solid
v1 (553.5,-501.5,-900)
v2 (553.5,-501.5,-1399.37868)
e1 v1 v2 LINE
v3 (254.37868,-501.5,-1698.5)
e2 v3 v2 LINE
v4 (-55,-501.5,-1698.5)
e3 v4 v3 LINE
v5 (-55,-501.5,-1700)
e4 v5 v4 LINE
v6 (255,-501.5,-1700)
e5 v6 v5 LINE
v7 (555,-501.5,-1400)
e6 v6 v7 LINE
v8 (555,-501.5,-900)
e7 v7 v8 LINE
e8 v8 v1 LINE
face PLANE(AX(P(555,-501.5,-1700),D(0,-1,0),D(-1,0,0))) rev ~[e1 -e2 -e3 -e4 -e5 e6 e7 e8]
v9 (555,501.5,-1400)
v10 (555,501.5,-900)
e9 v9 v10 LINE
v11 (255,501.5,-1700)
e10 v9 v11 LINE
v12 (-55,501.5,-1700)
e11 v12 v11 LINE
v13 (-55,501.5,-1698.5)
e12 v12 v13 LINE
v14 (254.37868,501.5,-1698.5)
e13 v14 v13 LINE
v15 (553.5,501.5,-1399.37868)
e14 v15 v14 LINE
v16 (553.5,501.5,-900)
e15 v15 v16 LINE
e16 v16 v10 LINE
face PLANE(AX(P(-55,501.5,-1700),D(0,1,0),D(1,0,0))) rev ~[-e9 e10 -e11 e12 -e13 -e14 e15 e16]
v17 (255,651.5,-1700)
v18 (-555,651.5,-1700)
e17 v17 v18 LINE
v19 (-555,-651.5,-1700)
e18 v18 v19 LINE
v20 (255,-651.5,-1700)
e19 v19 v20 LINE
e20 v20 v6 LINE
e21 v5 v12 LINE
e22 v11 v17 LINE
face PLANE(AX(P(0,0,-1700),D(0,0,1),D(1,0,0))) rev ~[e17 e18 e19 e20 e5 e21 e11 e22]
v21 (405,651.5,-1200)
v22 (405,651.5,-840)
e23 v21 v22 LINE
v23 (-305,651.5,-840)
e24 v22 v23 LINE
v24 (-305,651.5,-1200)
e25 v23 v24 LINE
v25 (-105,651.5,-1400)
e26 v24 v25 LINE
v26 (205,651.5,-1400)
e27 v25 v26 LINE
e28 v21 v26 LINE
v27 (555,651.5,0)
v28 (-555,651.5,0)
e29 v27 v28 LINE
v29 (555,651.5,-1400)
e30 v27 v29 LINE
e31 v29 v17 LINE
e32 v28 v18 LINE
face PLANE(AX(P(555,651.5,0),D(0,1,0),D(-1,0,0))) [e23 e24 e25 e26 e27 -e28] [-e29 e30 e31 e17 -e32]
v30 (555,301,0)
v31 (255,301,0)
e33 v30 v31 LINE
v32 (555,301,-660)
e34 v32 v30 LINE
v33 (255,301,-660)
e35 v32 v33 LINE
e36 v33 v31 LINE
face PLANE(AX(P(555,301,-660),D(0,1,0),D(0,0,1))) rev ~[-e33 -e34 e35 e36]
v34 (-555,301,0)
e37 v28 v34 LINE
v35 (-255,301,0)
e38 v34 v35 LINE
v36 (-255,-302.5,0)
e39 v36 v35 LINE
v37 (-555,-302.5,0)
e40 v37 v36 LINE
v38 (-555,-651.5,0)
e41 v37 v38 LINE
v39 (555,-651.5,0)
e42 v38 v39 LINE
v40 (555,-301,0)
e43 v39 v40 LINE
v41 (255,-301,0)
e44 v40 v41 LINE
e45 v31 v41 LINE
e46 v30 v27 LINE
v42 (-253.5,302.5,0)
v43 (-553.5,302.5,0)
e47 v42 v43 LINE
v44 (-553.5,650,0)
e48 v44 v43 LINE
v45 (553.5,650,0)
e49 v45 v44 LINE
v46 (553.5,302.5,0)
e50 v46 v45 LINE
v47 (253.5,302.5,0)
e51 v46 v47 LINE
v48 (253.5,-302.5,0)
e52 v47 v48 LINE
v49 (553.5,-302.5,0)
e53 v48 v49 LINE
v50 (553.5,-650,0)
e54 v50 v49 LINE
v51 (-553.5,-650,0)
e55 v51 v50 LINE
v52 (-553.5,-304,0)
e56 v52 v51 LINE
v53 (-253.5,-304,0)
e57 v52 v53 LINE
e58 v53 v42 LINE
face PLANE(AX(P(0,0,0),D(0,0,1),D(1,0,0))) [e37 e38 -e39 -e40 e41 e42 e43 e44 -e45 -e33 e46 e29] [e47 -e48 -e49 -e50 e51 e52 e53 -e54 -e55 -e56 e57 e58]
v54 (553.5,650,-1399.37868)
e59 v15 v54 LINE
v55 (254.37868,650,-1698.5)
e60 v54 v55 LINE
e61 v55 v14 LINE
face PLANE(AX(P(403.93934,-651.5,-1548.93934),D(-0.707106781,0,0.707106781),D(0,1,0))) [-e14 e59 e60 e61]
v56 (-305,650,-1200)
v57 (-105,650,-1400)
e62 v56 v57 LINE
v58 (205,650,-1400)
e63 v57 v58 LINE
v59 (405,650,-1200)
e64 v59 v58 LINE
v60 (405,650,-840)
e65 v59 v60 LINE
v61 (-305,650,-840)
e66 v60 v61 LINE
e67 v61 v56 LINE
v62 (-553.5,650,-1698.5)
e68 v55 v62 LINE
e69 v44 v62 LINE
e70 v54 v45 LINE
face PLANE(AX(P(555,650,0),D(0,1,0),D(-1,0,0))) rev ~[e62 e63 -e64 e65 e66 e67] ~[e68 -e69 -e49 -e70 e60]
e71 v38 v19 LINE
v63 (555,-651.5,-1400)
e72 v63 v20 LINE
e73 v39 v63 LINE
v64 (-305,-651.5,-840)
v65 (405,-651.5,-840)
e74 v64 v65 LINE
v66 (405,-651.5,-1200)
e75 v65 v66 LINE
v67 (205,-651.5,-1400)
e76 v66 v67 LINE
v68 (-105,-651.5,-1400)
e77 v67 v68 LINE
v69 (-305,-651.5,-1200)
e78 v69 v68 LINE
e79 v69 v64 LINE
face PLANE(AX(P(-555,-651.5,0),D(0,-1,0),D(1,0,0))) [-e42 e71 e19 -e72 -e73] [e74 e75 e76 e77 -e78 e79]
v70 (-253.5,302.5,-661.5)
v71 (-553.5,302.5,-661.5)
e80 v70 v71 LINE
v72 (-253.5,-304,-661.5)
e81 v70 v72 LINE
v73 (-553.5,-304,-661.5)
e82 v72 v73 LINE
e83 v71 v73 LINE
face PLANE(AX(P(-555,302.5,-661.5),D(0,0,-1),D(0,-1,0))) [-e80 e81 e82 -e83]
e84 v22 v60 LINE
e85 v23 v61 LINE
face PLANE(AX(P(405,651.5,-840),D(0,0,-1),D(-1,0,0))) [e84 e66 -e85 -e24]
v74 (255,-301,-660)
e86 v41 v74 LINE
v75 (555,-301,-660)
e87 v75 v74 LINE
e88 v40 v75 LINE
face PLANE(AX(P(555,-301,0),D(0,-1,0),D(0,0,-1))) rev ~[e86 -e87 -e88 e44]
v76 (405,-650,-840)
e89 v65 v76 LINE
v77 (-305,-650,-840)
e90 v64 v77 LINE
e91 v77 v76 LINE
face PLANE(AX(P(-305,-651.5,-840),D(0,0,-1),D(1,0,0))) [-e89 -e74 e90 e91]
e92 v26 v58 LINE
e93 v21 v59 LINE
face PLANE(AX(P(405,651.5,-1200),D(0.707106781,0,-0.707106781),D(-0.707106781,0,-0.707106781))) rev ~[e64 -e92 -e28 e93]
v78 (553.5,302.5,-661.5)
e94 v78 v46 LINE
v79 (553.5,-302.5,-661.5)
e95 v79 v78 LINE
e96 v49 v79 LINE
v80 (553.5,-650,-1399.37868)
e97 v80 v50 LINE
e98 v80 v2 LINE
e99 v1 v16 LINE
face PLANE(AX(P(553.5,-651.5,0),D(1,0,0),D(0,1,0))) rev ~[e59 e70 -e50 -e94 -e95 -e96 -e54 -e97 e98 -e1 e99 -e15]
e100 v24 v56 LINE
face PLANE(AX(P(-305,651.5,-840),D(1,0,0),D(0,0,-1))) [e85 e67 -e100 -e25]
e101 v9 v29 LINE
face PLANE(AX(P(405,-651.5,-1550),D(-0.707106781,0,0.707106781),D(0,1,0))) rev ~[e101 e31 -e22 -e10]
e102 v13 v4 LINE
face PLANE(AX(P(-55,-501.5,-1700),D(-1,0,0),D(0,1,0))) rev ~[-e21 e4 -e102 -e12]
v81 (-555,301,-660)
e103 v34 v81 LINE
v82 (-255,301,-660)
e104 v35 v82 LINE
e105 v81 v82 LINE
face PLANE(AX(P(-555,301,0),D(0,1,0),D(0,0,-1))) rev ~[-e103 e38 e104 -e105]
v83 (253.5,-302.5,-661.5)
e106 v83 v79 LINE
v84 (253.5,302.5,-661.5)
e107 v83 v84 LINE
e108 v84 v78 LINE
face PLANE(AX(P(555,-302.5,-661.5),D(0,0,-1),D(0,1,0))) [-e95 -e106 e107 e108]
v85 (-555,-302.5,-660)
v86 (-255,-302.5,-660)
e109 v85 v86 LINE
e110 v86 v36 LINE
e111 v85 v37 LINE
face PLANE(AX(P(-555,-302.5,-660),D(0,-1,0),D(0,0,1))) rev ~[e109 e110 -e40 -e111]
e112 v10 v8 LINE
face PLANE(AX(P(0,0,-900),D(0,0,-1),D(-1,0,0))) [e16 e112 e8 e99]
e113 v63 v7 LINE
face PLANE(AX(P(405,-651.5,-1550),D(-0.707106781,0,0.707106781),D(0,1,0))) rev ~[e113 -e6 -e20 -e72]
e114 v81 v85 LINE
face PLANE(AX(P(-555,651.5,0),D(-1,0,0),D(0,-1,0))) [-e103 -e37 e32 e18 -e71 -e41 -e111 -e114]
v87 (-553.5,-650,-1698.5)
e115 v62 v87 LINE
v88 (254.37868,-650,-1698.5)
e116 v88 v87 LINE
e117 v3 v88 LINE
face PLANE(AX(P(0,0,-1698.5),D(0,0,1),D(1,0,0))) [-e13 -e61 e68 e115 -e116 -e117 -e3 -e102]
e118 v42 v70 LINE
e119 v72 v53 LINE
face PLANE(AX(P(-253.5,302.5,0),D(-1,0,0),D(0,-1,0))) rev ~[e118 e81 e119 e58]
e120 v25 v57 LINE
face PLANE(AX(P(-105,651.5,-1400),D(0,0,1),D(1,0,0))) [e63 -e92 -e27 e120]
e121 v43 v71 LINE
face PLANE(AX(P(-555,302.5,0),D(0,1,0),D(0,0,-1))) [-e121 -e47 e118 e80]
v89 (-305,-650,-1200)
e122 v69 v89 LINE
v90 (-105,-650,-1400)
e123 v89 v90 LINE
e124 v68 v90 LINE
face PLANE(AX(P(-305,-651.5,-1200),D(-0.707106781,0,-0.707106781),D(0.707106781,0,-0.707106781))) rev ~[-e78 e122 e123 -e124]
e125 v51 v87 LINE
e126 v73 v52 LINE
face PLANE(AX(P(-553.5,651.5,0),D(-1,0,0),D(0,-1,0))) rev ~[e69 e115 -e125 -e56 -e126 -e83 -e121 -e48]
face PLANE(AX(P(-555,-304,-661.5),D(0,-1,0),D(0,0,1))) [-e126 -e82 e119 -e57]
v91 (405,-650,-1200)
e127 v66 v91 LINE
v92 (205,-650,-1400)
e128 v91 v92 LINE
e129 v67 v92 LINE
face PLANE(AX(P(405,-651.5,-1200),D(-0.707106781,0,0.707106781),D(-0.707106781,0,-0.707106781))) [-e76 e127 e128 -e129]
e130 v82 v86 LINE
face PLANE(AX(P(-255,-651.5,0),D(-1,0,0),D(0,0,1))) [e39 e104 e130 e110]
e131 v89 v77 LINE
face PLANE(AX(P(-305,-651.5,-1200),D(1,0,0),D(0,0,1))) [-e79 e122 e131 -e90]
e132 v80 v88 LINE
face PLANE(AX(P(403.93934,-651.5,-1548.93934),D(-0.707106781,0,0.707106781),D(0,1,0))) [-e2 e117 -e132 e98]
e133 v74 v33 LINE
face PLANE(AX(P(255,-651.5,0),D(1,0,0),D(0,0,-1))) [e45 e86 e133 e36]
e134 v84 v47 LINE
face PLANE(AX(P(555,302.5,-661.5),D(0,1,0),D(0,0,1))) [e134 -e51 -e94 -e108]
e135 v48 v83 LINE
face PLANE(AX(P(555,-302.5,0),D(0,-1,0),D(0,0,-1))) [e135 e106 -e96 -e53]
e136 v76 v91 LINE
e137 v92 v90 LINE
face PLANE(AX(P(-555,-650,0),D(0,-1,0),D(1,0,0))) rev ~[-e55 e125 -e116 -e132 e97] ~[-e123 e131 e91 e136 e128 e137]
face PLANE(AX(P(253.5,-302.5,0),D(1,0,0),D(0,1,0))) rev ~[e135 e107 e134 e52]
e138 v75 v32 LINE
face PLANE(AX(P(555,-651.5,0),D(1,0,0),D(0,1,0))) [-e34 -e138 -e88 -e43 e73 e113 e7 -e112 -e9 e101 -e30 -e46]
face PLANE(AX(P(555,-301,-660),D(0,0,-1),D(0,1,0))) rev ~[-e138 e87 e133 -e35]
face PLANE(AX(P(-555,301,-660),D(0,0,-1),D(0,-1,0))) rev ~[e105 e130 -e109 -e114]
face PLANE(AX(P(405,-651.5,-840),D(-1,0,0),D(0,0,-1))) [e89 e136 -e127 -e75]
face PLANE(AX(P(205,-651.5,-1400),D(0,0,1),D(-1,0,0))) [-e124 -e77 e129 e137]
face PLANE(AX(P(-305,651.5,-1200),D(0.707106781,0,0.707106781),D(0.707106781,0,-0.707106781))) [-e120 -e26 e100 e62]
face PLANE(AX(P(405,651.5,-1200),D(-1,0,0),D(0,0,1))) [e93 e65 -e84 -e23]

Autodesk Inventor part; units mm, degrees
ref_plane "YZ Plane" through (0, 0, 0) normal (1, 0, 0) x (0, 1, 0)
ref_plane "XZ Plane" through (0, 0, 0) normal (0, 1, 0) x (-1, 0, 0)
ref_plane "XY Plane" through (0, 0, 0) normal (0, 0, 1) x (1, 0, 0)
sketch "Esboço1" plane through (0, 0, 0) normal (0, 0, 1) x (1, 0, 0)
  line L0 (555, 651.5) -> (-555, 651.5)
  line L1 (-555, 651.5) -> (-555, -651.5)
  line L2 (-555, -651.5) -> (555, -651.5)
  line L3 (555, -651.5) -> (555, 651.5)
  point P0 (0, 0)
  point P1 (555, 0)
  point P2 (0, 651.5)
  dimension "d11" = 1110
  dimension "d12" = 1303
extrude "Extrusão1" add sketch "Esboço1" against normal blind 1700
sketch "Esboço3" plane through (-555, -651.5, 0) normal (0, -1, 0) x (1, 0, 0)
  line L0 (960, -1400) -> (250, -1400)
  line L1 (250, -1400) -> (250, -840)
  line L2 (250, -840) -> (960, -840)
  line L3 (960, -840) -> (960, -1400)
  line L4 (1110, 0) -> (1110, -1700) construction
  line L5 (0, 0) -> (0, -1700) construction
  line L6 (1110, -1700) -> (0, -1700) projected
  line L7 (1110, 0) -> (0, 0) construction
  point P0 (555, 0)
  dimension "d2" = 150
  dimension "d3" = 250
  dimension "d4" = 300
  dimension "d10" = 560
  dimension "d17" = 840
extrude "Extrusão2" cut sketch "Esboço3" against normal through all
chamfer "Chanfro2" distance 300 angle 45 1 edges at (555, 0, -1700)
chamfer "Chanfro1" distance 200 angle 45 2 edges at (-305, 0, -1400) (405, 0, -1400)
sketch "Esboço4" plane through (555, -651.5, 0) normal (1, 0, 0) x (0, 0, -1)
  line L0 (0, 1303) -> (0, 0) projected
  line L1 (660, 952.5) -> (0, 952.5)
  line L2 (0, 952.5) -> (0, 350.5)
  line L3 (0, 350.5) -> (660, 350.5)
  line L4 (660, 350.5) -> (660, 952.5)
  line L5 (0, 1303) -> (1400, 1303) projected
  line L6 (0, 0) -> (1400, 0) projected
  point P0 (0, 651.5)
  point P1 (0, 952.5)
  dimension "d19" = 350.5
  dimension "d20" = 350.5
  dimension "d21" = 660
  dimension "d22" = 602
extrude "Extrusão3" cut sketch "Esboço4" against normal blind 300
sketch "Esboço6" plane through (-555, -651.5, 0) normal (-1, 0, 0) x (0, 0, 1)
  line L0 (-660, 349) -> (0, 349)
  line L1 (0, 349) -> (0, 954)
  line L2 (0, 954) -> (-660, 954)
  line L3 (-660, 954) -> (-660, 349)
  line L4 (0, 1303) -> (0, 0) projected
  line L5 (0, 952.5) -> (-660, 952.5) projected
  point P0 (0, 651.5)
  point P1 (0, 651.5)
  dimension "d30" = 660
  dimension "d31" = 660
  dimension "d32" = 605
extrude "Extrusão5" cut sketch "Esboço6" against normal blind 300 contours L3 L5 L1 L0
shell "Casca1" thickness 1.5 removed faces 7 at (85, 534.6667, 0) at (168.3333, -217.1667, -840) at (-305, 217.1667, -960) at (-238.3333, -217.1667, -1266.6667) at (-1.6667, -217.1667, -1400) at (405, -217.1667, -1080) at (271.6667, -217.1667, -1333.3333)
sketch "Esboço5" plane through (0, 0, -1700) normal (0, 0, -1) x (-1, 0, 0)
  line L0 (55, 501.5) -> (-555, 501.5)
  line L1 (-555, 501.5) -> (-555, -501.5)
  line L2 (-555, -501.5) -> (55, -501.5)
  line L3 (55, -501.5) -> (55, 501.5)
  line L4 (-255, 651.5) -> (-555, 651.5) construction
  line L5 (-255, -651.5) -> (555, -651.5) construction
  line L6 (-555, 651.5) -> (-555, -651.5) construction
  line L7 (555, -651.5) -> (555, 651.5) construction
  line L8 (555, 651.5) -> (-555, 651.5)
  line L9 (-555, 651.5) -> (-555, -651.5)
  line L10 (-555, -651.5) -> (555, -651.5)
  line L11 (555, -651.5) -> (555, 651.5)
  point P0 (0, 0)
  dimension "d25" = 150
  dimension "d26" = 150
  dimension "d27" = 500
extrude "Extrusão4" cut sketch "Esboço5" against normal blind 800 contours L3 L2 L1 L0
sketch "Esboço7" plane through (255, -651.5, 0) normal (1, 0, 0) x (0, 0, -1)
  line L0 (661.5, 349) -> (0, 349) construction
  line L1 (440, 952.5) -> (435, 952.5)
  line L2 (435, 952.5) -> (435, 349)
  line L3 (435, 349) -> (440, 349)
  line L4 (440, 349) -> (440, 952.5)
  line L5 (0, 952.5) -> (660, 952.5) construction
  line L6 (0, 350.5) -> (0, 952.5) construction
  line L7 (660, 350.5) -> (0, 350.5) construction
  line L8 (660, 952.5) -> (660, 350.5) construction
  line L9 (0, 952.5) -> (660, 952.5) projected
  line L10 (215, 952.5) -> (210, 952.5)
  line L11 (210, 952.5) -> (210, 350.5)
  line L12 (210, 350.5) -> (215, 350.5)
  line L13 (215, 350.5) -> (215, 952.5)
  point P0 (0, 651.5)
  point P1 (437.5, 952.5)
  dimension "d35" = 5
  dimension "d36" = 220
  dimension "d37" = 220
equation "\"d20\" = d19"
equation "\"d26\" = d25"
equation "\"d36\" = d37"
properties part number "Croqui Célula"
